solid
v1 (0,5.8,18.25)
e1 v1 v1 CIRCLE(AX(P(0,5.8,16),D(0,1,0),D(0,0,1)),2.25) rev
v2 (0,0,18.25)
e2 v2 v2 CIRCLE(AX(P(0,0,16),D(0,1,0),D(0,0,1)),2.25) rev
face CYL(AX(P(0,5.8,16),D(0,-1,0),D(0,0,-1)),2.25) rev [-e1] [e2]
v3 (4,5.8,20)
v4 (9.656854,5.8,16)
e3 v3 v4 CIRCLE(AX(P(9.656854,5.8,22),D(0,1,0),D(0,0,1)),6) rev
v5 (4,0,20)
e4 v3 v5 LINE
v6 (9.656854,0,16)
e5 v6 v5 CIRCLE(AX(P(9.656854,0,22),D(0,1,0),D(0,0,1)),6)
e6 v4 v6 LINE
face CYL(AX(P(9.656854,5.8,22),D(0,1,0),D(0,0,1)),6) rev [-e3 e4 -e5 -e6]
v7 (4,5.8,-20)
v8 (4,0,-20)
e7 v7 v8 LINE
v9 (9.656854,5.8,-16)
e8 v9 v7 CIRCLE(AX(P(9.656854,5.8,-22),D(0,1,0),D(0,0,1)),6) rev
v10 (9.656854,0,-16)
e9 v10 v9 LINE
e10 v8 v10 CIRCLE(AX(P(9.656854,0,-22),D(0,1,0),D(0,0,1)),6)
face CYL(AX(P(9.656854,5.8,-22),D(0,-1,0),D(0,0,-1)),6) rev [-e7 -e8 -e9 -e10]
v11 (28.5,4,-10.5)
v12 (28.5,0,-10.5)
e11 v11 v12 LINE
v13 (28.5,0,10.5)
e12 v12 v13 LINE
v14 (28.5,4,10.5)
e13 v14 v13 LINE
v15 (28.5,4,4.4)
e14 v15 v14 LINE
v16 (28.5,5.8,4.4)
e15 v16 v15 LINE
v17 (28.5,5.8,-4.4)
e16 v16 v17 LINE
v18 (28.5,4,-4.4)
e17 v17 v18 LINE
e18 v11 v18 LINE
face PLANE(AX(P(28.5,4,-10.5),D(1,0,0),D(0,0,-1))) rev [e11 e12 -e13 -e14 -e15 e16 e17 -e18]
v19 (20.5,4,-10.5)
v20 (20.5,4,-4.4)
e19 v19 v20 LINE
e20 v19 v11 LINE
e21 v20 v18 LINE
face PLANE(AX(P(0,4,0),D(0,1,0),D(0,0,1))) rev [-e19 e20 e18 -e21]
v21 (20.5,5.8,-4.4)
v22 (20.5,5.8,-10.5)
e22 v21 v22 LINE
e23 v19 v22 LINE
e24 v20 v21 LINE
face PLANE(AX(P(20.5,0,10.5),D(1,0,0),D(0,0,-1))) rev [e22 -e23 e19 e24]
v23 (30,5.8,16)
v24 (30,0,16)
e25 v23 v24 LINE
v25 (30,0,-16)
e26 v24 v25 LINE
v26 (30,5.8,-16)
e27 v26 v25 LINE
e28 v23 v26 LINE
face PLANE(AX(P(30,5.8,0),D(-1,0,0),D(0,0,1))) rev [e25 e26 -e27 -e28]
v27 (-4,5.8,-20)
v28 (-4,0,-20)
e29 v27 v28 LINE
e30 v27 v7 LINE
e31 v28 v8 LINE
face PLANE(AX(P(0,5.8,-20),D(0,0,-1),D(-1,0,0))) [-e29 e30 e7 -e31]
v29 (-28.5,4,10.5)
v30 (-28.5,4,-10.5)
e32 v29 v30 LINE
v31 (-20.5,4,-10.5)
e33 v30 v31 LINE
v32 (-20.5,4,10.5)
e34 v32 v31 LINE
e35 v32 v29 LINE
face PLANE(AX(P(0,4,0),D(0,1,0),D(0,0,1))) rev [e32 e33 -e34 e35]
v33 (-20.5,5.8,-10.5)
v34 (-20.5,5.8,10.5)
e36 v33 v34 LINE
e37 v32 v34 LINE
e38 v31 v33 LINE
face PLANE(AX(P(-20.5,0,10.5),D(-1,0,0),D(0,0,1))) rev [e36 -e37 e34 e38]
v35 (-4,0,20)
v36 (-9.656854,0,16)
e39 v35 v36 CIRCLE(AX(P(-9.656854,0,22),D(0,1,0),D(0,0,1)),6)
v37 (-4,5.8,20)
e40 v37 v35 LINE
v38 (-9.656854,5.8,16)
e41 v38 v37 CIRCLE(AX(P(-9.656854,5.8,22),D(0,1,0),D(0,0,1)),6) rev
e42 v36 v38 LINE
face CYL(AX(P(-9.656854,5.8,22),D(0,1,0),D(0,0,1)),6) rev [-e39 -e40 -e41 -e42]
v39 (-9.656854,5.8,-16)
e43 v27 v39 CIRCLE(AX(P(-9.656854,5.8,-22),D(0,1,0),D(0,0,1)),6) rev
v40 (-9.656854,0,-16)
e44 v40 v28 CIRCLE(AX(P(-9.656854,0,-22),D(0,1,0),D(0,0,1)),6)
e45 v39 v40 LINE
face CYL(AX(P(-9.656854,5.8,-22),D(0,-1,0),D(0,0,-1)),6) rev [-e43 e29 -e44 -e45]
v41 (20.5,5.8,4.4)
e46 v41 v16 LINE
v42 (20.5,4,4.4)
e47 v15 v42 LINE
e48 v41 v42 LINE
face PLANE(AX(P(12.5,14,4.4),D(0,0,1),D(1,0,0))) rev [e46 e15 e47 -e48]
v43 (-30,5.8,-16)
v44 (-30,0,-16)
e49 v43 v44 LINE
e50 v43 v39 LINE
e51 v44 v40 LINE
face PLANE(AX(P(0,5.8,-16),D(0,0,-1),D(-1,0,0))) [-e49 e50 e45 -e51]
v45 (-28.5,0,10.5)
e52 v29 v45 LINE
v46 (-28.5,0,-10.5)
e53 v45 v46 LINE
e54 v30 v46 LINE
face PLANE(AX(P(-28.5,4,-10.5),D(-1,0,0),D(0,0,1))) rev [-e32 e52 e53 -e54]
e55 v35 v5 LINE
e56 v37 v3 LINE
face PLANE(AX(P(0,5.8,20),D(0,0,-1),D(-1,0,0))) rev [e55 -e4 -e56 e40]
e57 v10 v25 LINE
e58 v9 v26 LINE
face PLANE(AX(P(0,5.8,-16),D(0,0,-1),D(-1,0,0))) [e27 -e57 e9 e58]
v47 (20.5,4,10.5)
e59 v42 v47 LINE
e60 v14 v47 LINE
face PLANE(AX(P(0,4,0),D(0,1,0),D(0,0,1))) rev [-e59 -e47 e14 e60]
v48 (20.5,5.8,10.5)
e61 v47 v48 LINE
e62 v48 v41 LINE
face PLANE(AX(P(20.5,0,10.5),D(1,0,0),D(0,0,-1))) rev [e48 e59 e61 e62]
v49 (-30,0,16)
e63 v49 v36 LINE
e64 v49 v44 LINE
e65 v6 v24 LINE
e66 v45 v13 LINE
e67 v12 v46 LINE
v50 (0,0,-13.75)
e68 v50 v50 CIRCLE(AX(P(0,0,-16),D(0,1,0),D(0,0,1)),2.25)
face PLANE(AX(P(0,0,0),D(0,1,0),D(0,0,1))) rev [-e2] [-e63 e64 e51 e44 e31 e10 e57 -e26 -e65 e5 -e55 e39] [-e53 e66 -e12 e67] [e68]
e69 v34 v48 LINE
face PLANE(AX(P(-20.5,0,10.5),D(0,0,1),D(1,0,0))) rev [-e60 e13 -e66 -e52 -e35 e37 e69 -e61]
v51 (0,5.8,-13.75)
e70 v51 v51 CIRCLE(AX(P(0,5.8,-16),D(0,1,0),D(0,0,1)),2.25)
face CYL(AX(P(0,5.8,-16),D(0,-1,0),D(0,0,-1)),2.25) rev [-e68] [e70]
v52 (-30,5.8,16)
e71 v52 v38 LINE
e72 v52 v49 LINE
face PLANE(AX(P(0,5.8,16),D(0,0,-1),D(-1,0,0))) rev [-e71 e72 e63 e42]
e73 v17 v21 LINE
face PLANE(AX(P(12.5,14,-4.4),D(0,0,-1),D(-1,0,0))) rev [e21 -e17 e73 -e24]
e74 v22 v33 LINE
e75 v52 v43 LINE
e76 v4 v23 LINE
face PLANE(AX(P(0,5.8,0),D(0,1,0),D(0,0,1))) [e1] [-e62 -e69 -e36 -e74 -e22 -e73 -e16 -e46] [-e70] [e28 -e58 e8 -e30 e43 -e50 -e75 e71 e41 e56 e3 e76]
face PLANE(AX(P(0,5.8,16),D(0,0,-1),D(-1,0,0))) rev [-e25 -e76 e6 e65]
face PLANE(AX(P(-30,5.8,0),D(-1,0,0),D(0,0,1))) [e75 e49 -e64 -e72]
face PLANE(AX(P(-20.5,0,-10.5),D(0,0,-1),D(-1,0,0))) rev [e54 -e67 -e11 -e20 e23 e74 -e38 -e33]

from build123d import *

# Parameters (mm, degrees)
RESSALTO_EXTRUS_O1_DEPTH = 5.8
ESBO_O2_W                = 41
ESBO_O2_H                = 21
CORTE_EXTRUS_O1_DEPTH    = 37.519036132
FILETE1_R                = 6
ESBO_O4_W                = 57
ESBO_O4_H                = 21
CORTE_EXTRUS_O2_DEPTH    = 4
ESBO_O5_W                = 16
ESBO_O5_H                = 8.8
CORTE_EXTRUS_O3_DEPTH    = 10


with BuildPart() as part:
    # Esboço1 → Ressalto-extrusão1 (new body)
    with BuildSketch(Plane(origin=(0, 0, 0), x_dir=(1, 0, 0), z_dir=(0, 1, 0))):
        with BuildLine():
            Line((-4, 20), (-4, 16))
            Line((-4, 16), (-2.25, 16))
            ThreePointArc((-2.25, 16), (0, 18.25), (2.25, 16))
            Line((2.25, 16), (4, 16))
            Line((4, 16), (4, 20))
            Line((4, 20), (-4, 20))
        make_face()
        with BuildLine():
            Line((-2.25, 16), (-4, 16))
            Line((-4, 16), (-4, 12))
            Line((-4, 12), (4, 12))
            Line((4, 12), (4, 16))
            Line((4, 16), (2.25, 16))
            ThreePointArc((2.25, 16), (0, 13.75), (-2.25, 16))
        make_face()
        Polygon((-30, 16), (-30, -16), (-4, -16), (-4, -12), (4, -12), (4, -16), (30, -16), (30, 16), (4, 16), (4, 12), (-4, 12), (-4, 16), align=None)
        with BuildLine():
            Line((-4, -12), (-4, -16))
            Line((-4, -16), (-2.25, -16))
            ThreePointArc((-2.25, -16), (0, -13.75), (2.25, -16))
            Line((2.25, -16), (4, -16))
            Line((4, -16), (4, -12))
            Line((4, -12), (-4, -12))
        make_face()
        with BuildLine():
            Line((-2.25, -16), (-4, -16))
            Line((-4, -16), (-4, -20))
            Line((-4, -20), (4, -20))
            Line((4, -20), (4, -16))
            Line((4, -16), (2.25, -16))
            ThreePointArc((2.25, -16), (0, -18.25), (-2.25, -16))
        make_face()
    extrude(amount=RESSALTO_EXTRUS_O1_DEPTH)

    # Esboço2 → Corte-extrusão1 (cut, through all)
    with BuildSketch(Plane(origin=(0, 5.8, 0), x_dir=(1, 0, 0), z_dir=(0, 1, 0))):
        Rectangle(ESBO_O2_W, ESBO_O2_H)
    extrude(amount=-CORTE_EXTRUS_O1_DEPTH, mode=Mode.SUBTRACT)

    # Filete1
    # the kernel refuses this fillet: 6 mm, written as the material it adds along each edge
    with BuildSketch(Plane(origin=(4, 0, -16), x_dir=(0, 0, -1), z_dir=(0, 1, 0))) as filete1_piece_1:
        with BuildLine():
            CenterArc((6, -5.656854249), FILETE1_R, 109.471220634, 70.528779366)
            Line((0, -5.656854249), (-0.12, -5.656854249))
            Line((-0.12, -5.656854249), (-0.12, 0))
            Line((-0.12, 0), (0, 0.12))
            ThreePointArc((0, 0.12), (2, 0.12), (3.96, 0.113137085))
            Line((3.96, 0.113137085), (4, 0))
        make_face()
    extrude(amount=5.8)
    with BuildSketch(Plane(origin=(-4, 0, -16), x_dir=(0, 0, -1), z_dir=(0, 1, 0))) as filete1_piece_2:
        with BuildLine():
            CenterArc((6, 5.656854249), FILETE1_R, 180, 70.528779366)
            Line((0, 5.656854249), (-0.12, 5.656854249))
            Line((-0.12, 5.656854249), (-0.12, 0))
            Line((-0.12, 0), (0, -0.12))
            ThreePointArc((0, -0.12), (2, -0.12), (3.96, -0.113137085))
            Line((3.96, -0.113137085), (4, 0))
        make_face()
    extrude(amount=5.8)
    with BuildSketch(Plane(origin=(-4, 0, 16), x_dir=(-1, 0, 0), z_dir=(0, 1, 0))) as filete1_piece_3:
        with BuildLine():
            CenterArc((5.656854249, 6), FILETE1_R, 199.471220634, 70.528779366)
            Line((0, 4), (-0.113137085, 3.96))
            ThreePointArc((-0.113137085, 3.96), (-0.12, 2), (-0.12, 0))
            Line((-0.12, 0), (0, -0.12))
            Line((0, -0.12), (5.656854249, -0.12))
            Line((5.656854249, -0.12), (5.656854249, 0))
        make_face()
    extrude(amount=5.8)
    with BuildSketch(Plane(origin=(4, 0, 16), x_dir=(1, 0, 0), z_dir=(0, 1, 0))) as filete1_piece_4:
        with BuildLine():
            CenterArc((5.656854249, -6), FILETE1_R, 90, 70.528779366)
            Line((0, -4), (-0.113137085, -3.96))
            ThreePointArc((-0.113137085, -3.96), (-0.12, -2), (-0.12, 0))
            Line((-0.12, 0), (0, 0.12))
            Line((0, 0.12), (5.656854249, 0.12))
            Line((5.656854249, 0.12), (5.656854249, 0))
        make_face()
    extrude(amount=5.8)

    # Esboço4 → Corte-extrusão2 (cut)
    with BuildSketch(Plane.XZ):
        Rectangle(ESBO_O4_W, ESBO_O4_H)
    extrude(amount=-CORTE_EXTRUS_O2_DEPTH, mode=Mode.SUBTRACT)

    # Esboço5 → Corte-extrusão3 (cut)
    with BuildSketch(Plane.XZ.offset(-4)):
        with Locations((20.5, 0)):
            Rectangle(ESBO_O5_W, ESBO_O5_H)
    extrude(amount=-CORTE_EXTRUS_O3_DEPTH, mode=Mode.SUBTRACT)


solid = part.part
